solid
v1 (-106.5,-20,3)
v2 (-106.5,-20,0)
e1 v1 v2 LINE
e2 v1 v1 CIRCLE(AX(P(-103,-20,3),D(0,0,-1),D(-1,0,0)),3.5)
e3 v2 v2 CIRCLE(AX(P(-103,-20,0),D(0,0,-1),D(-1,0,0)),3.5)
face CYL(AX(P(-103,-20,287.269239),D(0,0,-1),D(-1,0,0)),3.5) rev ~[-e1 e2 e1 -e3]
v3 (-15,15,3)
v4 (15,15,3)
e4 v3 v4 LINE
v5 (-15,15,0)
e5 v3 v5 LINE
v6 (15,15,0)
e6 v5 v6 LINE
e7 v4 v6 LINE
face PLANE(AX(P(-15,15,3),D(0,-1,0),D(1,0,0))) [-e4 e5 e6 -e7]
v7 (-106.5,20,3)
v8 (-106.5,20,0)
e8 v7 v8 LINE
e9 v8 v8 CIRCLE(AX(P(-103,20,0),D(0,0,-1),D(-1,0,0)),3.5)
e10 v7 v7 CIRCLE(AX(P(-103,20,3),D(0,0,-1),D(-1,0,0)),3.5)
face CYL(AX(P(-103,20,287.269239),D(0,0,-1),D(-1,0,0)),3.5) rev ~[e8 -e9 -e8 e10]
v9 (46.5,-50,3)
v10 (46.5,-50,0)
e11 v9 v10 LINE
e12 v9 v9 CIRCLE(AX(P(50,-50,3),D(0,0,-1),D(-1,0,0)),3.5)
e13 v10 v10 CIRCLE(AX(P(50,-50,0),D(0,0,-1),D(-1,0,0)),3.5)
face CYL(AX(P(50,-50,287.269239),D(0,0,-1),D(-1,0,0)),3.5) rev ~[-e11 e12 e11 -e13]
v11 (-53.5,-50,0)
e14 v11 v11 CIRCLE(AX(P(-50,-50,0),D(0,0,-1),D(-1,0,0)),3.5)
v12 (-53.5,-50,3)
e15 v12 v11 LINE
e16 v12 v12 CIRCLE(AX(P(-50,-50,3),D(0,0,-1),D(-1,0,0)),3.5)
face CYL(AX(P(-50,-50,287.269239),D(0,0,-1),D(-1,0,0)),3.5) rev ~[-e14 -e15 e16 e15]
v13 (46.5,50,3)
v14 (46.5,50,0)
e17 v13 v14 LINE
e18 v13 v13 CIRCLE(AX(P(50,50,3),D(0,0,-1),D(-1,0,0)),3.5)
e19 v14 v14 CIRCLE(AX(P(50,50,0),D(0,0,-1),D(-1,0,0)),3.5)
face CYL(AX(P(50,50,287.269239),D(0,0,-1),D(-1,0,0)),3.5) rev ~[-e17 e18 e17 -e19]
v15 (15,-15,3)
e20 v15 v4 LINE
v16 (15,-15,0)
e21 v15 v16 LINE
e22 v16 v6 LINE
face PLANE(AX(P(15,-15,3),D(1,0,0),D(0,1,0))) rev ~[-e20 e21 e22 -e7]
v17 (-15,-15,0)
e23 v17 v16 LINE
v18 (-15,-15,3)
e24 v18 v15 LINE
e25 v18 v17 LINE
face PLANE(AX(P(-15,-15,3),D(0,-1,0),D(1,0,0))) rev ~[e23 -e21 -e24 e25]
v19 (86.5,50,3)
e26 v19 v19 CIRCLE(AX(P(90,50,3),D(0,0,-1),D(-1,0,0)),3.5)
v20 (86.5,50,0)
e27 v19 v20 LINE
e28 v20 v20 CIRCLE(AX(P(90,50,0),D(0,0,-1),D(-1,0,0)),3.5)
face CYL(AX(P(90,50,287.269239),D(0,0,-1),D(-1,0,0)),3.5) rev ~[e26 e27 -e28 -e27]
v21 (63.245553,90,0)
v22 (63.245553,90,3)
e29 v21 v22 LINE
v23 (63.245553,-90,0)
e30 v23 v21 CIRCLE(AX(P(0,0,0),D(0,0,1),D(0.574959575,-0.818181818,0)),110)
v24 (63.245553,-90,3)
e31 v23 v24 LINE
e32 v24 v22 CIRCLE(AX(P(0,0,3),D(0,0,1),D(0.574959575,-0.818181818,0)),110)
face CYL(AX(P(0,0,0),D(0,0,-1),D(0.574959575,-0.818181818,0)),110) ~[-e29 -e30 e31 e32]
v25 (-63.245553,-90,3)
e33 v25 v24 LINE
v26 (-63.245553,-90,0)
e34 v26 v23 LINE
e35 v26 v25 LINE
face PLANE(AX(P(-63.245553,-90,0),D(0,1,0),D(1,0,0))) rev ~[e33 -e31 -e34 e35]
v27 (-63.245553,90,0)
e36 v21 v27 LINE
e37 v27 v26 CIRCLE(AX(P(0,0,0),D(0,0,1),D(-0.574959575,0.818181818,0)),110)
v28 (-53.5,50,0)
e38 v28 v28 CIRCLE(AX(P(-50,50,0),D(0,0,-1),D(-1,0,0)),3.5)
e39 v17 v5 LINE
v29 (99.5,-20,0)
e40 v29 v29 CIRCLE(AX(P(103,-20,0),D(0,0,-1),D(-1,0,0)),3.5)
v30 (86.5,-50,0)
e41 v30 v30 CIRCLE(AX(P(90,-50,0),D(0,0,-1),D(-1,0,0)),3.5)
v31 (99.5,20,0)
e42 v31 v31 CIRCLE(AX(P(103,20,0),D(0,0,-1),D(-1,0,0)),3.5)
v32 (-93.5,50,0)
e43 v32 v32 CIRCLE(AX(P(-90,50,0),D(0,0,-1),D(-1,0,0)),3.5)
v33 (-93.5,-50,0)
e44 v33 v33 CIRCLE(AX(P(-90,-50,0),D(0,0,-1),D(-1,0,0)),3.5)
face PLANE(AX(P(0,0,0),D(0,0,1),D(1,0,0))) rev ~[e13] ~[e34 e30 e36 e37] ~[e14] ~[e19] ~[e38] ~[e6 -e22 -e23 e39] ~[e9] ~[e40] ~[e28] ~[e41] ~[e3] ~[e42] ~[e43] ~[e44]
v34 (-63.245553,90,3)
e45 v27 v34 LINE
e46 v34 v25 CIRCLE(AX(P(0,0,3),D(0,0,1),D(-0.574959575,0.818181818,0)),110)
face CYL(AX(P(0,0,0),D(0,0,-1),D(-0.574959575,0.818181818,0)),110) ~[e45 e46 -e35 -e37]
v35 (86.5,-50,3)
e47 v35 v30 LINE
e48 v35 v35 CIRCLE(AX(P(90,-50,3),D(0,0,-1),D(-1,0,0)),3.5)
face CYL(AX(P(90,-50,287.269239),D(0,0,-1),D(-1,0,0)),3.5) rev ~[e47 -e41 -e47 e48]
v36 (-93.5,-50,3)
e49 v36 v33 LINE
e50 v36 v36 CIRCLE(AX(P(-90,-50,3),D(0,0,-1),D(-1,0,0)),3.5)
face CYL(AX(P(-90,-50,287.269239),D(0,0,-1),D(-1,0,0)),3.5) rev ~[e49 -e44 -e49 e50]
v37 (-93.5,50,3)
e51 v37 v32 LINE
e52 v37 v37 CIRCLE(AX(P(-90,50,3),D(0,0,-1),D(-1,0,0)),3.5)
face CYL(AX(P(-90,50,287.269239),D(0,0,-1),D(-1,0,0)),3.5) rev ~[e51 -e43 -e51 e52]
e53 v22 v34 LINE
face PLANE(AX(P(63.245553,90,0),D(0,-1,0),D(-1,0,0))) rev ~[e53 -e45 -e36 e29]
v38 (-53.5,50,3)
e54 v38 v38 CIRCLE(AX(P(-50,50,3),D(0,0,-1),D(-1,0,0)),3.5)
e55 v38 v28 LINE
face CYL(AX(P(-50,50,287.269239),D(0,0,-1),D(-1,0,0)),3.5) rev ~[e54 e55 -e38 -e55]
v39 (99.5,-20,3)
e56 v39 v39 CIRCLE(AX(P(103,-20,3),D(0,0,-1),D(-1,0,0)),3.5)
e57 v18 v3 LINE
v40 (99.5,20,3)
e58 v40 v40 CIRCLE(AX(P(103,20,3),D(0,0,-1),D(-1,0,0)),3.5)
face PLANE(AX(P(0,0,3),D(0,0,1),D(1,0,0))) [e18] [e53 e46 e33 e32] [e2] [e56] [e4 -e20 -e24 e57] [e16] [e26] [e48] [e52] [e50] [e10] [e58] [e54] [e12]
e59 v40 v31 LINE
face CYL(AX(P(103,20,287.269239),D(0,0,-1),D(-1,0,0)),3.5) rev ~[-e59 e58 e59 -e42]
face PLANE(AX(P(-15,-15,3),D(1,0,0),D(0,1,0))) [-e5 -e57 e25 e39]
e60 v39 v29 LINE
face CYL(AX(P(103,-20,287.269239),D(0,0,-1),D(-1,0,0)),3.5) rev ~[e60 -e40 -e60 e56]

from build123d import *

# Parameters (mm, degrees)
F1_DEPTH = 3
F3_D     = 7
F5_D     = 7
F6_W     = 30
F6_H     = 30
F7_DEPTH = 3.001


# Not quite as in the source:
# - a feature names something its author has since deleted; it is built from what else it names


with BuildPart() as f1:
    # F0 (on Top) → F1 (new body)
    with BuildSketch(Plane.XY):
        with BuildLine():
            Line((63.2455532034, 90), (-63.2455532034, 90))
            ThreePointArc((-63.2455532034, 90), (-110, 0), (-63.2455532034, -90))
            Line((-63.2455532034, -90), (63.2455532034, -90))
            ThreePointArc((63.2455532034, -90), (110, 0), (63.2455532034, 90))
        make_face()
    extrude(amount=F1_DEPTH)

    # F3 (through all)
    with Locations(Plane.XY.offset(3)):
        with Locations((-103, 20), (-103, -20), (-90, 50), (-90, -50), (90, -50), (90, 50), (103, 20), (103, -20)):
            Hole(F3_D / 2)

    # F5 (through all)
    with Locations(Plane.XY.offset(3)):
        with Locations((-50, 50), (50, 50), (50, -50), (-50, -50)):
            Hole(F5_D / 2)

    # F6 (on face) → F7 (cut, through all)
    with BuildSketch(Plane.XY.offset(3)):
        Rectangle(F6_W, F6_H)
    extrude(amount=-F7_DEPTH, mode=Mode.SUBTRACT)


solid = f1.part
